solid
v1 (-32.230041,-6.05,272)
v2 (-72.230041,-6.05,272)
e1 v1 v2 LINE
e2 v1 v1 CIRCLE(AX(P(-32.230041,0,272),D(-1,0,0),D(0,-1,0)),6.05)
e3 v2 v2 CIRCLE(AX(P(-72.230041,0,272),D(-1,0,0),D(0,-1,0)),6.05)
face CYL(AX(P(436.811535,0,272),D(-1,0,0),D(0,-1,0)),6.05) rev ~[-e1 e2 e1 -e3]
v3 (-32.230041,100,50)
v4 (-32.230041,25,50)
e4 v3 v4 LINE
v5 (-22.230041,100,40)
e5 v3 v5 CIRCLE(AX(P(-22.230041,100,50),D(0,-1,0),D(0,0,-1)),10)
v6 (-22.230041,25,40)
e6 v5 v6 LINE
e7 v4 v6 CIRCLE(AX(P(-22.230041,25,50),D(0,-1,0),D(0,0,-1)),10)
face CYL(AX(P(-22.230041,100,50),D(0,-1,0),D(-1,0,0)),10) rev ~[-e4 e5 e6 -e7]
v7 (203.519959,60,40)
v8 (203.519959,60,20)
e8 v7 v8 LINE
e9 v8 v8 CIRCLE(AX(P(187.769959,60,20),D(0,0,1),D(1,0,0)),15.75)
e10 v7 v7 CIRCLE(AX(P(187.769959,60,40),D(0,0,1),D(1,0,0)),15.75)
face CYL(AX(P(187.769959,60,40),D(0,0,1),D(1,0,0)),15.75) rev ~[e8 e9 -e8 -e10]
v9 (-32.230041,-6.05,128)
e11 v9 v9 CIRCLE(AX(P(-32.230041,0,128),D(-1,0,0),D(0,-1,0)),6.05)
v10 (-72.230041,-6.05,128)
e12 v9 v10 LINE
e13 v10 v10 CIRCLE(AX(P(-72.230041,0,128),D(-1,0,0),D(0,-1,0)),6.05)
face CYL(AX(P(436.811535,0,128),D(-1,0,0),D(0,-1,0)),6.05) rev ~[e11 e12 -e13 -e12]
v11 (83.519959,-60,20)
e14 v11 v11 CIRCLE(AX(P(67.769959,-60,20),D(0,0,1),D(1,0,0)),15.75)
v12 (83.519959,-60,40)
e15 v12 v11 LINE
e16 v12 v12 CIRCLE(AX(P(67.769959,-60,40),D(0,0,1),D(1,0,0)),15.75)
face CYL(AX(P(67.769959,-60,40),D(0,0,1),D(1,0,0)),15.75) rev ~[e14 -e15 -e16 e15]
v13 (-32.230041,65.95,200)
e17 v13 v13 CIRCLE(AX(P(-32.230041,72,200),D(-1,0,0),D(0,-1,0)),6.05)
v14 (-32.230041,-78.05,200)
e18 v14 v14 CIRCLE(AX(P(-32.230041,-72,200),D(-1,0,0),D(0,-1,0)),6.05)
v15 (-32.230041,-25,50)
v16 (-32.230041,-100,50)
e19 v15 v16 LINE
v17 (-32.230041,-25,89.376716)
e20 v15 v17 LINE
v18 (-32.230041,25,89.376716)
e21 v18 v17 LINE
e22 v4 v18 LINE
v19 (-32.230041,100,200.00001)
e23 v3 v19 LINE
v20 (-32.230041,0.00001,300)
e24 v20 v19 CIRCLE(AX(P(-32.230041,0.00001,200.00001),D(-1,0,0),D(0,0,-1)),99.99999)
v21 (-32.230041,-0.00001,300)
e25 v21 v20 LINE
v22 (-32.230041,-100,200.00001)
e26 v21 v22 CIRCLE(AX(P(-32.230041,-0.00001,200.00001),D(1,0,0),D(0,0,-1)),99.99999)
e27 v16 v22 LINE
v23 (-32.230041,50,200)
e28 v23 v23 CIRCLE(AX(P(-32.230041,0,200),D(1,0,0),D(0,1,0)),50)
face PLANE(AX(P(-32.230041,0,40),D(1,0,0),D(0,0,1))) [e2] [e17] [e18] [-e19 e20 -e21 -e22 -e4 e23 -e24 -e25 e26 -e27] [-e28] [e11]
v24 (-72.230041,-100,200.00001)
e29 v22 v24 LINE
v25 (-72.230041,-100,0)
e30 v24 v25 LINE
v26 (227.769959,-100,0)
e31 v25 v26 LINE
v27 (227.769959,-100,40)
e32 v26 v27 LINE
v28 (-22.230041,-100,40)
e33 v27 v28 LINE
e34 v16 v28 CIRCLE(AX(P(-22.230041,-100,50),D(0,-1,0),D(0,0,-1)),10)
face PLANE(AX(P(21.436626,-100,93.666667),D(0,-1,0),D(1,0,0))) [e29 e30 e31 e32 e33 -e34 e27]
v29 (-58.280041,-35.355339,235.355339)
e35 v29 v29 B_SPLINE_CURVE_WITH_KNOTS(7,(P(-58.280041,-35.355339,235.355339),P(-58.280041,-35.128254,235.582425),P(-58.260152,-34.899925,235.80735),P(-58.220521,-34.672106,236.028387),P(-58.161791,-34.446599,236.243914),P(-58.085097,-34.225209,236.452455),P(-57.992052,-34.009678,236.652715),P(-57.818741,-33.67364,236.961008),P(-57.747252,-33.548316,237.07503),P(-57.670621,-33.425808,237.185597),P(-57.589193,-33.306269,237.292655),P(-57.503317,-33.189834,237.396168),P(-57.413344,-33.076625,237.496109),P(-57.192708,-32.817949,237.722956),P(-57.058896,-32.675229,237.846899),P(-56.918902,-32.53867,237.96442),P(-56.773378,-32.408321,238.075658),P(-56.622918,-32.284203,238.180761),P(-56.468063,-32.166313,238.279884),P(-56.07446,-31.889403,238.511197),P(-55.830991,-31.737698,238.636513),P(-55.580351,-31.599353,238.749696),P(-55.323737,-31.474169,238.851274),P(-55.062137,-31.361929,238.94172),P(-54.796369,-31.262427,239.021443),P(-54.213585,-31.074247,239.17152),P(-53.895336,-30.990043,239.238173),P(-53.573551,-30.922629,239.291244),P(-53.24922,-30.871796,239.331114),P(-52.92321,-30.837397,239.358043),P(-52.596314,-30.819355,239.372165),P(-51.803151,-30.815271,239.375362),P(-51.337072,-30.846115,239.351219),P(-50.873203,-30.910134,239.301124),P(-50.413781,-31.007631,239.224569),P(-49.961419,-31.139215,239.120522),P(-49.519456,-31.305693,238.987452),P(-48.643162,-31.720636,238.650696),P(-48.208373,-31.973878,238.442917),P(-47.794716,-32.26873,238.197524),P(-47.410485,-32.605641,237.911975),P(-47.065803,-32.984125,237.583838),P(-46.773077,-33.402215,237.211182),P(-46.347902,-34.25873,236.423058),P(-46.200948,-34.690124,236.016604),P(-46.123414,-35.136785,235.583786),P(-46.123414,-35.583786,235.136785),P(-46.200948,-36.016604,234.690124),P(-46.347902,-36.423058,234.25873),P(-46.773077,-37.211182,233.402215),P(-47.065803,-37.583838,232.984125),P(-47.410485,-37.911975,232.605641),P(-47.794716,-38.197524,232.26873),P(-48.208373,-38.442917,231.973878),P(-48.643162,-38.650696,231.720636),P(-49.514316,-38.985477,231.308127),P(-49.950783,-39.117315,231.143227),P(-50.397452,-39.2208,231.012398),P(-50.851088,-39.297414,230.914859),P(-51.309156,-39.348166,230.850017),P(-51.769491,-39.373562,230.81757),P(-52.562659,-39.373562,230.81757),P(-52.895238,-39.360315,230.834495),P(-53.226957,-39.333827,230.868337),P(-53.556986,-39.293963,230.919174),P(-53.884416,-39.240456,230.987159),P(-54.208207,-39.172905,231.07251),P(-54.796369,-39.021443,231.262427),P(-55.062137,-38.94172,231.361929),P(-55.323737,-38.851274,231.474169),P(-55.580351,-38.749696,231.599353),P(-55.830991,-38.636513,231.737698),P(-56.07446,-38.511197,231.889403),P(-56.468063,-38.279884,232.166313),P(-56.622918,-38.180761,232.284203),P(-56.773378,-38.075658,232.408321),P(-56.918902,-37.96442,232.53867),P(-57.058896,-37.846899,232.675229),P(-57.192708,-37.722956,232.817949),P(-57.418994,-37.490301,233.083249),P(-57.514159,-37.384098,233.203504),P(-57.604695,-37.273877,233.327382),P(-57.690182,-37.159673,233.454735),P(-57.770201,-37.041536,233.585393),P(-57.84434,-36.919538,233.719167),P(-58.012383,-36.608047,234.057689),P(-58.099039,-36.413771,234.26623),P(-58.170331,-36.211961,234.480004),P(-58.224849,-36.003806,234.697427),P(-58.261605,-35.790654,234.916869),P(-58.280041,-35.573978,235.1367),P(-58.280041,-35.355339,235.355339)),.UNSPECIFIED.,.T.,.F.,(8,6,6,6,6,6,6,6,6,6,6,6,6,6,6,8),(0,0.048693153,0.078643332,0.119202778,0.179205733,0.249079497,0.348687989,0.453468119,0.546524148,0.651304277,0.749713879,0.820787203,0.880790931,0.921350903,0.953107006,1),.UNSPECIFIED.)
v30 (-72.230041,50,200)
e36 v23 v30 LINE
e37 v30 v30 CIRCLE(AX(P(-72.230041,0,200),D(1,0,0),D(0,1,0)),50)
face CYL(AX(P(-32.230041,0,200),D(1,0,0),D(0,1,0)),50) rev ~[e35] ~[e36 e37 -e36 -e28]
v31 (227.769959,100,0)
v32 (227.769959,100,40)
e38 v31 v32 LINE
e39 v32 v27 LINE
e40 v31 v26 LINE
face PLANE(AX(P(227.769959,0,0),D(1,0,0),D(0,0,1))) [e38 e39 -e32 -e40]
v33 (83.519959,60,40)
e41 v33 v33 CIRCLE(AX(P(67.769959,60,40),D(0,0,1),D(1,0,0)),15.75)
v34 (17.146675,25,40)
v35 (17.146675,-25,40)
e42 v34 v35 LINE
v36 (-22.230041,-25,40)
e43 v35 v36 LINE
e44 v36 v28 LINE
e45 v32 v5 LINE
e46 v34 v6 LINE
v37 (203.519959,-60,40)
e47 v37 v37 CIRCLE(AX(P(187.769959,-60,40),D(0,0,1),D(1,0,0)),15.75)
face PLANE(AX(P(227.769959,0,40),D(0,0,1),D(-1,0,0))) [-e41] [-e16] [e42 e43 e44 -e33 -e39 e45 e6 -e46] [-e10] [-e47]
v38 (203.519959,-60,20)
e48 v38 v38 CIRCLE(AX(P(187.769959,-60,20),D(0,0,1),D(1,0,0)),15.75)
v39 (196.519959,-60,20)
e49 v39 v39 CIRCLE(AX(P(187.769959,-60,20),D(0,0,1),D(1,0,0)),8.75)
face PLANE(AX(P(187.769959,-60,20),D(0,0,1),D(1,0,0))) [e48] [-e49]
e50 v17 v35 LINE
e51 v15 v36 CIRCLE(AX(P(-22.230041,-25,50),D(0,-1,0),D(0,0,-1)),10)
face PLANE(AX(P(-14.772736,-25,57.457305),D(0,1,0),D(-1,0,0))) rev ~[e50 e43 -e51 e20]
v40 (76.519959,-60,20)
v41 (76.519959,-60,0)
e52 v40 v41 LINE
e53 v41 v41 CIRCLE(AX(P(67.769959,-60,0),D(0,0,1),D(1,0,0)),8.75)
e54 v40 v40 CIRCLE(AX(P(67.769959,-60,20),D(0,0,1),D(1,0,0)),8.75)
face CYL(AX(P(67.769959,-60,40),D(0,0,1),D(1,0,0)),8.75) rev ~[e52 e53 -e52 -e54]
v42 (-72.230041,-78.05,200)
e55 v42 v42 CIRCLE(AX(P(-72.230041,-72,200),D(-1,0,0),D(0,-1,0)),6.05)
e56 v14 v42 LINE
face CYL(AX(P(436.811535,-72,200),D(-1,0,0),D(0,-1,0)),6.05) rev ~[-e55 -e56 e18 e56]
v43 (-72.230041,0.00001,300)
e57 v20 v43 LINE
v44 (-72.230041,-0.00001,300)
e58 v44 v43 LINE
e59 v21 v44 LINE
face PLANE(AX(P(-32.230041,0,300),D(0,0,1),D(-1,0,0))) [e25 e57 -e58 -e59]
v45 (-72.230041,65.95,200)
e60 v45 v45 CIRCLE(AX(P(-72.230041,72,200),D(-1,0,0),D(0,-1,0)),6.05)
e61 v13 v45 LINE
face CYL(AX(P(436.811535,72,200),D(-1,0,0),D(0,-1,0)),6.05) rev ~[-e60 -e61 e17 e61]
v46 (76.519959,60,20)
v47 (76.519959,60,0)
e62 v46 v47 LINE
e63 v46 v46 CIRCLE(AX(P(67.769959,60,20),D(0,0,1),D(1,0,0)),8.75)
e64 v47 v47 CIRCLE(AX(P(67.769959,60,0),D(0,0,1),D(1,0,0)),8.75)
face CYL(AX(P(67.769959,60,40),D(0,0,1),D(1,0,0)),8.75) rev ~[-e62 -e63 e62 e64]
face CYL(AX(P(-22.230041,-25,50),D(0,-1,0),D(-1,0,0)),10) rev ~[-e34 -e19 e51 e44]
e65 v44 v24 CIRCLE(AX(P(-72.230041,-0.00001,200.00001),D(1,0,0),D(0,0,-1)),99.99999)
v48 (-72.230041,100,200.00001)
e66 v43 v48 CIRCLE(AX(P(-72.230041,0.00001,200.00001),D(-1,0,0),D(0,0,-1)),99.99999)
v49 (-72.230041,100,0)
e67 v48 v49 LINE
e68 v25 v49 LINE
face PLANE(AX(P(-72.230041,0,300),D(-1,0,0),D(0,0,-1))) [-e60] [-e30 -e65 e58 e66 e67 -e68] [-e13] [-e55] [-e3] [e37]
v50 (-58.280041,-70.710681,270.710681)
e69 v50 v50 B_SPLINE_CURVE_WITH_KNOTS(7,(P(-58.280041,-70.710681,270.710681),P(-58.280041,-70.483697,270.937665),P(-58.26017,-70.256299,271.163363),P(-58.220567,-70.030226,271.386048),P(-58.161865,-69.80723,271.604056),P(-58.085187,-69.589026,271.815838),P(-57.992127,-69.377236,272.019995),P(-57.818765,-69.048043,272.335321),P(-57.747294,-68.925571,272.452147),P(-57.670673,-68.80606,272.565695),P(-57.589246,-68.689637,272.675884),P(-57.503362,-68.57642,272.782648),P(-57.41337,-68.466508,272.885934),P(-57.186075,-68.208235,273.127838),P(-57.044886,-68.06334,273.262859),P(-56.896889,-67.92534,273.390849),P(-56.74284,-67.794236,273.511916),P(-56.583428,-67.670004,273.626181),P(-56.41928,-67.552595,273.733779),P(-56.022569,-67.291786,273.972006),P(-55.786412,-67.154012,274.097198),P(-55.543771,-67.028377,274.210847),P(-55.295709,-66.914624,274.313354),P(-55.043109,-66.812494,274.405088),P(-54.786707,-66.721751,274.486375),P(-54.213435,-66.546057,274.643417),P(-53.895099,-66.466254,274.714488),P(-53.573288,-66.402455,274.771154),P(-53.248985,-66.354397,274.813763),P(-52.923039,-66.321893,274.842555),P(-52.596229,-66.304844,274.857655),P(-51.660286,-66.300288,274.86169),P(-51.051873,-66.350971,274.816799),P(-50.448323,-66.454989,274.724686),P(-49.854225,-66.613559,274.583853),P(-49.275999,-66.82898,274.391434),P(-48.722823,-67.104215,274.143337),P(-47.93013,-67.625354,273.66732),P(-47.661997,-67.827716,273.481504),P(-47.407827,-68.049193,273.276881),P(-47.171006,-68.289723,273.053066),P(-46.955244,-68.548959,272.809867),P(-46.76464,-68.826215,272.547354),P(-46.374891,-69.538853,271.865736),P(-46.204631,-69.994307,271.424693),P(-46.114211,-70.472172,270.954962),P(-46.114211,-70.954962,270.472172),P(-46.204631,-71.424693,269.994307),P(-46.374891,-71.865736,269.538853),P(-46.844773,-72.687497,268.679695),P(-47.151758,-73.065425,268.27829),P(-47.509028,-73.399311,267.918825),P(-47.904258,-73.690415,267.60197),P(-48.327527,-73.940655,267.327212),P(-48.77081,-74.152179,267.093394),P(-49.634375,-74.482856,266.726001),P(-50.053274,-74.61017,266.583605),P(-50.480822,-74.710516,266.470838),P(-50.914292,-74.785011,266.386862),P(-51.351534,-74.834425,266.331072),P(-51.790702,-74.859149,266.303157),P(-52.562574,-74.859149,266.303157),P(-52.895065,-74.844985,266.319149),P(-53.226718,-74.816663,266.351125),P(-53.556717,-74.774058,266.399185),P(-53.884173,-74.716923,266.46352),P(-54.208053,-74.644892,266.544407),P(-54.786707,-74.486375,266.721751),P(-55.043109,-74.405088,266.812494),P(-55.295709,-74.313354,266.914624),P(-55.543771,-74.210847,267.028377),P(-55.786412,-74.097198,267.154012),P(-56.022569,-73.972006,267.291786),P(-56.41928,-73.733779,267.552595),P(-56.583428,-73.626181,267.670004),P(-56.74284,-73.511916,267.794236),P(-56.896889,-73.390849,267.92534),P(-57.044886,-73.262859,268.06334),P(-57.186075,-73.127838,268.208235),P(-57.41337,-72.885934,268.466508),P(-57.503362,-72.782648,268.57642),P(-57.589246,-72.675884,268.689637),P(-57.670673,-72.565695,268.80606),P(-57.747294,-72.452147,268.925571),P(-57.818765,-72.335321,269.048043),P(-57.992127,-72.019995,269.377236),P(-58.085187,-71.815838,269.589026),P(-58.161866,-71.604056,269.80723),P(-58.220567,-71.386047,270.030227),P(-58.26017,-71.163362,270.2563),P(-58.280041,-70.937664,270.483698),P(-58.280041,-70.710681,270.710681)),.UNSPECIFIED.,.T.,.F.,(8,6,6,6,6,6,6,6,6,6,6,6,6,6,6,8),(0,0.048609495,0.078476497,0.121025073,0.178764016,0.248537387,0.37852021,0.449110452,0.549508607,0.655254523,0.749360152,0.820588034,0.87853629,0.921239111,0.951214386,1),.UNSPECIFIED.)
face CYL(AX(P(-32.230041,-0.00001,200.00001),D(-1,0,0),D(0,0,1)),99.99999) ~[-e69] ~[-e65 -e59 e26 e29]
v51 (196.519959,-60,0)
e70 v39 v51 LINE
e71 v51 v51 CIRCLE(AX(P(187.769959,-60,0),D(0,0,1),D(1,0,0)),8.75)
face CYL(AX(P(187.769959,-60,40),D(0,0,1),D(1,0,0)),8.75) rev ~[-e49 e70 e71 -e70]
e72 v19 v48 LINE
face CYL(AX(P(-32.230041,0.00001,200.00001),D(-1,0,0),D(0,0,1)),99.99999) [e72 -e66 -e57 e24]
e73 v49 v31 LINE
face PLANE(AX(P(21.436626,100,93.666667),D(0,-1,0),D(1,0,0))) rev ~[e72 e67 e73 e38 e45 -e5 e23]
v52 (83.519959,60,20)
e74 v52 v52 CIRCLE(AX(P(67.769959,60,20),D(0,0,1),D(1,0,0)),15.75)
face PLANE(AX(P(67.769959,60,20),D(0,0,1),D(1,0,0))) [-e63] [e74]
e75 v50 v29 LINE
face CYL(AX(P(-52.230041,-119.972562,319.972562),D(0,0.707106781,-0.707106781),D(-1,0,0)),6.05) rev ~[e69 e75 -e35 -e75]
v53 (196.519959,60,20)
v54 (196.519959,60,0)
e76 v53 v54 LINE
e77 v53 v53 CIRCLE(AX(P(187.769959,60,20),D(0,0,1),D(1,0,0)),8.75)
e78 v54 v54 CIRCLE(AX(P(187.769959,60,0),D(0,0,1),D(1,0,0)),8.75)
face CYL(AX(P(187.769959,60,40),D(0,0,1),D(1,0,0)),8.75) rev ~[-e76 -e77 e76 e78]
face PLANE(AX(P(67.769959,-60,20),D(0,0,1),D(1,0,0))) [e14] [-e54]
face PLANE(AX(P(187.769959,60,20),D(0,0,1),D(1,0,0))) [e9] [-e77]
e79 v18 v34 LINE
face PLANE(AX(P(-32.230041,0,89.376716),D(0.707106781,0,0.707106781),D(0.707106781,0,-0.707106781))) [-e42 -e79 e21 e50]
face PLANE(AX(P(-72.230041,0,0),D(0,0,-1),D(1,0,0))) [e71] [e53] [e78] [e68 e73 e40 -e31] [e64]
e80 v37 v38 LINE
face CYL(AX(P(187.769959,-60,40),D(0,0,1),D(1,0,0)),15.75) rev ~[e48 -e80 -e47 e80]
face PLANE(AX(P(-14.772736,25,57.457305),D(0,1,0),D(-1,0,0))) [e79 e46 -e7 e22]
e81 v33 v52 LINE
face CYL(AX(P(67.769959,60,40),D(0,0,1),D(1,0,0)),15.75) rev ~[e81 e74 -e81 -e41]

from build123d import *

# Parameters (mm, degrees)
F1_DEPTH  = 100
F2_R      = 99.99999
F3_R      = 8.75
F4_DEPTH  = 40.001
F3_R_2    = 15.75
F5_DEPTH  = 20
F6_R      = 50
F7_DEPTH  = 40.001
F11_DEPTH = 25
F12_R     = 10
F13_D     = 12.1
F16_D     = 12.1
F16_DEPTH = 69.85
F16_START = 0.1831763
F16_TIP   = 3.6352067451


# Not quite as in the source:
# - a fillet or chamfer is up to 0.001 mm smaller than in the source, because OpenCascade refuses the exact size


with BuildPart() as f1:
    # F0 (on Front) → F1 (new body, symmetric)
    with BuildSketch(Plane.XZ):
        Polygon((-72.2300410013, 0), (227.7699589987, 0), (227.7699589987, 40), (-32.2300410013, 40), (-32.2300410013, 300), (-72.2300410013, 300), align=None)
    extrude(amount=F1_DEPTH, both=True)

    # F2 (radius 100 in the source; OpenCascade refuses exactly that, so slightly less here)
    f2_edges = [f1.edges().sort_by_distance(p)[0] for p in [
        (-52.230041, -100, 300),
        (-52.230041, 100, 300),
    ]]
    fillet(f2_edges, radius=F2_R)

    # F3 (on face) → F4 (cut, through all)
    with BuildSketch(Plane.XY.offset(40)):
        with Locations((67.7699589987, 60)):
            Circle(F3_R)
        with Locations((187.7699589987, 60)):
            Circle(F3_R)
        with Locations((67.7699589987, -60)):
            Circle(F3_R)
        with Locations((187.7699589987, -60)):
            Circle(F3_R)
    extrude(amount=-F4_DEPTH, mode=Mode.SUBTRACT)

    # F3 (on face) → F5 (cut)
    with BuildSketch(Plane.XY.offset(40)):
        with Locations((187.7699589987, 60)):
            Circle(F3_R_2)
        with Locations((187.7699589987, 60)):
            Circle(F3_R, mode=Mode.SUBTRACT)
        with Locations((67.7699589987, 60)):
            Circle(F3_R_2)
        with Locations((67.7699589987, 60)):
            Circle(F3_R, mode=Mode.SUBTRACT)
        with Locations((67.7699589987, -60)):
            Circle(F3_R_2)
        with Locations((67.7699589987, -60)):
            Circle(F3_R, mode=Mode.SUBTRACT)
        with Locations((187.7699589987, -60)):
            Circle(F3_R_2)
        with Locations((187.7699589987, -60)):
            Circle(F3_R, mode=Mode.SUBTRACT)
    extrude(amount=-F5_DEPTH, mode=Mode.SUBTRACT)

    # F6 (on face) → F7 (cut, through all)
    with BuildSketch(Plane.YZ.offset(-32.2300410013)):
        with Locations((0, 200)):
            Circle(F6_R)
    extrude(amount=-F7_DEPTH, mode=Mode.SUBTRACT)

    # F10 (on offset) → F11 (join, symmetric)
    with BuildSketch(Plane(origin=(0, 0, 0), x_dir=(-1, 0, 0), z_dir=(0, 1, 0))):
        Polygon((-17.1466749161, 40), (32.2300410013, 40), (32.2300410013, 89.3767159174), align=None)
    extrude(amount=F11_DEPTH, both=True)

    # F12
    f12_edges = [f1.edges().sort_by_distance(p)[0] for p in [
        (-32.230041, 62.5, 40),
        (-32.230041, -62.5, 40),
    ]]
    fillet(f12_edges, radius=F12_R)

    # F13 (through all)
    with Locations(Plane.YZ.offset(-32.2300410013)):
        with Locations((0, 272), (72, 200), (0, 128), (-72, 200)):
            Hole(F13_D / 2)

    # F16
    # its depths count from where the whole tool has entered the part; down to there all is cleared
    with Locations(Plane(origin=(0, -170.7106781187, 170.7106781187), x_dir=(1, 0, 0), z_dir=(0, -0.7071067812, 0.7071067812)).offset(-F16_START)):
        with Locations((-52.2300410013, 141.4213562373)):
            Hole(F16_D / 2, depth=F16_DEPTH)
            with Locations((0, 0, -(F16_DEPTH + F16_TIP / 2))):  # 118° drill point
                Cone(0, F16_D / 2, F16_TIP, mode=Mode.SUBTRACT)


solid = f1.part
